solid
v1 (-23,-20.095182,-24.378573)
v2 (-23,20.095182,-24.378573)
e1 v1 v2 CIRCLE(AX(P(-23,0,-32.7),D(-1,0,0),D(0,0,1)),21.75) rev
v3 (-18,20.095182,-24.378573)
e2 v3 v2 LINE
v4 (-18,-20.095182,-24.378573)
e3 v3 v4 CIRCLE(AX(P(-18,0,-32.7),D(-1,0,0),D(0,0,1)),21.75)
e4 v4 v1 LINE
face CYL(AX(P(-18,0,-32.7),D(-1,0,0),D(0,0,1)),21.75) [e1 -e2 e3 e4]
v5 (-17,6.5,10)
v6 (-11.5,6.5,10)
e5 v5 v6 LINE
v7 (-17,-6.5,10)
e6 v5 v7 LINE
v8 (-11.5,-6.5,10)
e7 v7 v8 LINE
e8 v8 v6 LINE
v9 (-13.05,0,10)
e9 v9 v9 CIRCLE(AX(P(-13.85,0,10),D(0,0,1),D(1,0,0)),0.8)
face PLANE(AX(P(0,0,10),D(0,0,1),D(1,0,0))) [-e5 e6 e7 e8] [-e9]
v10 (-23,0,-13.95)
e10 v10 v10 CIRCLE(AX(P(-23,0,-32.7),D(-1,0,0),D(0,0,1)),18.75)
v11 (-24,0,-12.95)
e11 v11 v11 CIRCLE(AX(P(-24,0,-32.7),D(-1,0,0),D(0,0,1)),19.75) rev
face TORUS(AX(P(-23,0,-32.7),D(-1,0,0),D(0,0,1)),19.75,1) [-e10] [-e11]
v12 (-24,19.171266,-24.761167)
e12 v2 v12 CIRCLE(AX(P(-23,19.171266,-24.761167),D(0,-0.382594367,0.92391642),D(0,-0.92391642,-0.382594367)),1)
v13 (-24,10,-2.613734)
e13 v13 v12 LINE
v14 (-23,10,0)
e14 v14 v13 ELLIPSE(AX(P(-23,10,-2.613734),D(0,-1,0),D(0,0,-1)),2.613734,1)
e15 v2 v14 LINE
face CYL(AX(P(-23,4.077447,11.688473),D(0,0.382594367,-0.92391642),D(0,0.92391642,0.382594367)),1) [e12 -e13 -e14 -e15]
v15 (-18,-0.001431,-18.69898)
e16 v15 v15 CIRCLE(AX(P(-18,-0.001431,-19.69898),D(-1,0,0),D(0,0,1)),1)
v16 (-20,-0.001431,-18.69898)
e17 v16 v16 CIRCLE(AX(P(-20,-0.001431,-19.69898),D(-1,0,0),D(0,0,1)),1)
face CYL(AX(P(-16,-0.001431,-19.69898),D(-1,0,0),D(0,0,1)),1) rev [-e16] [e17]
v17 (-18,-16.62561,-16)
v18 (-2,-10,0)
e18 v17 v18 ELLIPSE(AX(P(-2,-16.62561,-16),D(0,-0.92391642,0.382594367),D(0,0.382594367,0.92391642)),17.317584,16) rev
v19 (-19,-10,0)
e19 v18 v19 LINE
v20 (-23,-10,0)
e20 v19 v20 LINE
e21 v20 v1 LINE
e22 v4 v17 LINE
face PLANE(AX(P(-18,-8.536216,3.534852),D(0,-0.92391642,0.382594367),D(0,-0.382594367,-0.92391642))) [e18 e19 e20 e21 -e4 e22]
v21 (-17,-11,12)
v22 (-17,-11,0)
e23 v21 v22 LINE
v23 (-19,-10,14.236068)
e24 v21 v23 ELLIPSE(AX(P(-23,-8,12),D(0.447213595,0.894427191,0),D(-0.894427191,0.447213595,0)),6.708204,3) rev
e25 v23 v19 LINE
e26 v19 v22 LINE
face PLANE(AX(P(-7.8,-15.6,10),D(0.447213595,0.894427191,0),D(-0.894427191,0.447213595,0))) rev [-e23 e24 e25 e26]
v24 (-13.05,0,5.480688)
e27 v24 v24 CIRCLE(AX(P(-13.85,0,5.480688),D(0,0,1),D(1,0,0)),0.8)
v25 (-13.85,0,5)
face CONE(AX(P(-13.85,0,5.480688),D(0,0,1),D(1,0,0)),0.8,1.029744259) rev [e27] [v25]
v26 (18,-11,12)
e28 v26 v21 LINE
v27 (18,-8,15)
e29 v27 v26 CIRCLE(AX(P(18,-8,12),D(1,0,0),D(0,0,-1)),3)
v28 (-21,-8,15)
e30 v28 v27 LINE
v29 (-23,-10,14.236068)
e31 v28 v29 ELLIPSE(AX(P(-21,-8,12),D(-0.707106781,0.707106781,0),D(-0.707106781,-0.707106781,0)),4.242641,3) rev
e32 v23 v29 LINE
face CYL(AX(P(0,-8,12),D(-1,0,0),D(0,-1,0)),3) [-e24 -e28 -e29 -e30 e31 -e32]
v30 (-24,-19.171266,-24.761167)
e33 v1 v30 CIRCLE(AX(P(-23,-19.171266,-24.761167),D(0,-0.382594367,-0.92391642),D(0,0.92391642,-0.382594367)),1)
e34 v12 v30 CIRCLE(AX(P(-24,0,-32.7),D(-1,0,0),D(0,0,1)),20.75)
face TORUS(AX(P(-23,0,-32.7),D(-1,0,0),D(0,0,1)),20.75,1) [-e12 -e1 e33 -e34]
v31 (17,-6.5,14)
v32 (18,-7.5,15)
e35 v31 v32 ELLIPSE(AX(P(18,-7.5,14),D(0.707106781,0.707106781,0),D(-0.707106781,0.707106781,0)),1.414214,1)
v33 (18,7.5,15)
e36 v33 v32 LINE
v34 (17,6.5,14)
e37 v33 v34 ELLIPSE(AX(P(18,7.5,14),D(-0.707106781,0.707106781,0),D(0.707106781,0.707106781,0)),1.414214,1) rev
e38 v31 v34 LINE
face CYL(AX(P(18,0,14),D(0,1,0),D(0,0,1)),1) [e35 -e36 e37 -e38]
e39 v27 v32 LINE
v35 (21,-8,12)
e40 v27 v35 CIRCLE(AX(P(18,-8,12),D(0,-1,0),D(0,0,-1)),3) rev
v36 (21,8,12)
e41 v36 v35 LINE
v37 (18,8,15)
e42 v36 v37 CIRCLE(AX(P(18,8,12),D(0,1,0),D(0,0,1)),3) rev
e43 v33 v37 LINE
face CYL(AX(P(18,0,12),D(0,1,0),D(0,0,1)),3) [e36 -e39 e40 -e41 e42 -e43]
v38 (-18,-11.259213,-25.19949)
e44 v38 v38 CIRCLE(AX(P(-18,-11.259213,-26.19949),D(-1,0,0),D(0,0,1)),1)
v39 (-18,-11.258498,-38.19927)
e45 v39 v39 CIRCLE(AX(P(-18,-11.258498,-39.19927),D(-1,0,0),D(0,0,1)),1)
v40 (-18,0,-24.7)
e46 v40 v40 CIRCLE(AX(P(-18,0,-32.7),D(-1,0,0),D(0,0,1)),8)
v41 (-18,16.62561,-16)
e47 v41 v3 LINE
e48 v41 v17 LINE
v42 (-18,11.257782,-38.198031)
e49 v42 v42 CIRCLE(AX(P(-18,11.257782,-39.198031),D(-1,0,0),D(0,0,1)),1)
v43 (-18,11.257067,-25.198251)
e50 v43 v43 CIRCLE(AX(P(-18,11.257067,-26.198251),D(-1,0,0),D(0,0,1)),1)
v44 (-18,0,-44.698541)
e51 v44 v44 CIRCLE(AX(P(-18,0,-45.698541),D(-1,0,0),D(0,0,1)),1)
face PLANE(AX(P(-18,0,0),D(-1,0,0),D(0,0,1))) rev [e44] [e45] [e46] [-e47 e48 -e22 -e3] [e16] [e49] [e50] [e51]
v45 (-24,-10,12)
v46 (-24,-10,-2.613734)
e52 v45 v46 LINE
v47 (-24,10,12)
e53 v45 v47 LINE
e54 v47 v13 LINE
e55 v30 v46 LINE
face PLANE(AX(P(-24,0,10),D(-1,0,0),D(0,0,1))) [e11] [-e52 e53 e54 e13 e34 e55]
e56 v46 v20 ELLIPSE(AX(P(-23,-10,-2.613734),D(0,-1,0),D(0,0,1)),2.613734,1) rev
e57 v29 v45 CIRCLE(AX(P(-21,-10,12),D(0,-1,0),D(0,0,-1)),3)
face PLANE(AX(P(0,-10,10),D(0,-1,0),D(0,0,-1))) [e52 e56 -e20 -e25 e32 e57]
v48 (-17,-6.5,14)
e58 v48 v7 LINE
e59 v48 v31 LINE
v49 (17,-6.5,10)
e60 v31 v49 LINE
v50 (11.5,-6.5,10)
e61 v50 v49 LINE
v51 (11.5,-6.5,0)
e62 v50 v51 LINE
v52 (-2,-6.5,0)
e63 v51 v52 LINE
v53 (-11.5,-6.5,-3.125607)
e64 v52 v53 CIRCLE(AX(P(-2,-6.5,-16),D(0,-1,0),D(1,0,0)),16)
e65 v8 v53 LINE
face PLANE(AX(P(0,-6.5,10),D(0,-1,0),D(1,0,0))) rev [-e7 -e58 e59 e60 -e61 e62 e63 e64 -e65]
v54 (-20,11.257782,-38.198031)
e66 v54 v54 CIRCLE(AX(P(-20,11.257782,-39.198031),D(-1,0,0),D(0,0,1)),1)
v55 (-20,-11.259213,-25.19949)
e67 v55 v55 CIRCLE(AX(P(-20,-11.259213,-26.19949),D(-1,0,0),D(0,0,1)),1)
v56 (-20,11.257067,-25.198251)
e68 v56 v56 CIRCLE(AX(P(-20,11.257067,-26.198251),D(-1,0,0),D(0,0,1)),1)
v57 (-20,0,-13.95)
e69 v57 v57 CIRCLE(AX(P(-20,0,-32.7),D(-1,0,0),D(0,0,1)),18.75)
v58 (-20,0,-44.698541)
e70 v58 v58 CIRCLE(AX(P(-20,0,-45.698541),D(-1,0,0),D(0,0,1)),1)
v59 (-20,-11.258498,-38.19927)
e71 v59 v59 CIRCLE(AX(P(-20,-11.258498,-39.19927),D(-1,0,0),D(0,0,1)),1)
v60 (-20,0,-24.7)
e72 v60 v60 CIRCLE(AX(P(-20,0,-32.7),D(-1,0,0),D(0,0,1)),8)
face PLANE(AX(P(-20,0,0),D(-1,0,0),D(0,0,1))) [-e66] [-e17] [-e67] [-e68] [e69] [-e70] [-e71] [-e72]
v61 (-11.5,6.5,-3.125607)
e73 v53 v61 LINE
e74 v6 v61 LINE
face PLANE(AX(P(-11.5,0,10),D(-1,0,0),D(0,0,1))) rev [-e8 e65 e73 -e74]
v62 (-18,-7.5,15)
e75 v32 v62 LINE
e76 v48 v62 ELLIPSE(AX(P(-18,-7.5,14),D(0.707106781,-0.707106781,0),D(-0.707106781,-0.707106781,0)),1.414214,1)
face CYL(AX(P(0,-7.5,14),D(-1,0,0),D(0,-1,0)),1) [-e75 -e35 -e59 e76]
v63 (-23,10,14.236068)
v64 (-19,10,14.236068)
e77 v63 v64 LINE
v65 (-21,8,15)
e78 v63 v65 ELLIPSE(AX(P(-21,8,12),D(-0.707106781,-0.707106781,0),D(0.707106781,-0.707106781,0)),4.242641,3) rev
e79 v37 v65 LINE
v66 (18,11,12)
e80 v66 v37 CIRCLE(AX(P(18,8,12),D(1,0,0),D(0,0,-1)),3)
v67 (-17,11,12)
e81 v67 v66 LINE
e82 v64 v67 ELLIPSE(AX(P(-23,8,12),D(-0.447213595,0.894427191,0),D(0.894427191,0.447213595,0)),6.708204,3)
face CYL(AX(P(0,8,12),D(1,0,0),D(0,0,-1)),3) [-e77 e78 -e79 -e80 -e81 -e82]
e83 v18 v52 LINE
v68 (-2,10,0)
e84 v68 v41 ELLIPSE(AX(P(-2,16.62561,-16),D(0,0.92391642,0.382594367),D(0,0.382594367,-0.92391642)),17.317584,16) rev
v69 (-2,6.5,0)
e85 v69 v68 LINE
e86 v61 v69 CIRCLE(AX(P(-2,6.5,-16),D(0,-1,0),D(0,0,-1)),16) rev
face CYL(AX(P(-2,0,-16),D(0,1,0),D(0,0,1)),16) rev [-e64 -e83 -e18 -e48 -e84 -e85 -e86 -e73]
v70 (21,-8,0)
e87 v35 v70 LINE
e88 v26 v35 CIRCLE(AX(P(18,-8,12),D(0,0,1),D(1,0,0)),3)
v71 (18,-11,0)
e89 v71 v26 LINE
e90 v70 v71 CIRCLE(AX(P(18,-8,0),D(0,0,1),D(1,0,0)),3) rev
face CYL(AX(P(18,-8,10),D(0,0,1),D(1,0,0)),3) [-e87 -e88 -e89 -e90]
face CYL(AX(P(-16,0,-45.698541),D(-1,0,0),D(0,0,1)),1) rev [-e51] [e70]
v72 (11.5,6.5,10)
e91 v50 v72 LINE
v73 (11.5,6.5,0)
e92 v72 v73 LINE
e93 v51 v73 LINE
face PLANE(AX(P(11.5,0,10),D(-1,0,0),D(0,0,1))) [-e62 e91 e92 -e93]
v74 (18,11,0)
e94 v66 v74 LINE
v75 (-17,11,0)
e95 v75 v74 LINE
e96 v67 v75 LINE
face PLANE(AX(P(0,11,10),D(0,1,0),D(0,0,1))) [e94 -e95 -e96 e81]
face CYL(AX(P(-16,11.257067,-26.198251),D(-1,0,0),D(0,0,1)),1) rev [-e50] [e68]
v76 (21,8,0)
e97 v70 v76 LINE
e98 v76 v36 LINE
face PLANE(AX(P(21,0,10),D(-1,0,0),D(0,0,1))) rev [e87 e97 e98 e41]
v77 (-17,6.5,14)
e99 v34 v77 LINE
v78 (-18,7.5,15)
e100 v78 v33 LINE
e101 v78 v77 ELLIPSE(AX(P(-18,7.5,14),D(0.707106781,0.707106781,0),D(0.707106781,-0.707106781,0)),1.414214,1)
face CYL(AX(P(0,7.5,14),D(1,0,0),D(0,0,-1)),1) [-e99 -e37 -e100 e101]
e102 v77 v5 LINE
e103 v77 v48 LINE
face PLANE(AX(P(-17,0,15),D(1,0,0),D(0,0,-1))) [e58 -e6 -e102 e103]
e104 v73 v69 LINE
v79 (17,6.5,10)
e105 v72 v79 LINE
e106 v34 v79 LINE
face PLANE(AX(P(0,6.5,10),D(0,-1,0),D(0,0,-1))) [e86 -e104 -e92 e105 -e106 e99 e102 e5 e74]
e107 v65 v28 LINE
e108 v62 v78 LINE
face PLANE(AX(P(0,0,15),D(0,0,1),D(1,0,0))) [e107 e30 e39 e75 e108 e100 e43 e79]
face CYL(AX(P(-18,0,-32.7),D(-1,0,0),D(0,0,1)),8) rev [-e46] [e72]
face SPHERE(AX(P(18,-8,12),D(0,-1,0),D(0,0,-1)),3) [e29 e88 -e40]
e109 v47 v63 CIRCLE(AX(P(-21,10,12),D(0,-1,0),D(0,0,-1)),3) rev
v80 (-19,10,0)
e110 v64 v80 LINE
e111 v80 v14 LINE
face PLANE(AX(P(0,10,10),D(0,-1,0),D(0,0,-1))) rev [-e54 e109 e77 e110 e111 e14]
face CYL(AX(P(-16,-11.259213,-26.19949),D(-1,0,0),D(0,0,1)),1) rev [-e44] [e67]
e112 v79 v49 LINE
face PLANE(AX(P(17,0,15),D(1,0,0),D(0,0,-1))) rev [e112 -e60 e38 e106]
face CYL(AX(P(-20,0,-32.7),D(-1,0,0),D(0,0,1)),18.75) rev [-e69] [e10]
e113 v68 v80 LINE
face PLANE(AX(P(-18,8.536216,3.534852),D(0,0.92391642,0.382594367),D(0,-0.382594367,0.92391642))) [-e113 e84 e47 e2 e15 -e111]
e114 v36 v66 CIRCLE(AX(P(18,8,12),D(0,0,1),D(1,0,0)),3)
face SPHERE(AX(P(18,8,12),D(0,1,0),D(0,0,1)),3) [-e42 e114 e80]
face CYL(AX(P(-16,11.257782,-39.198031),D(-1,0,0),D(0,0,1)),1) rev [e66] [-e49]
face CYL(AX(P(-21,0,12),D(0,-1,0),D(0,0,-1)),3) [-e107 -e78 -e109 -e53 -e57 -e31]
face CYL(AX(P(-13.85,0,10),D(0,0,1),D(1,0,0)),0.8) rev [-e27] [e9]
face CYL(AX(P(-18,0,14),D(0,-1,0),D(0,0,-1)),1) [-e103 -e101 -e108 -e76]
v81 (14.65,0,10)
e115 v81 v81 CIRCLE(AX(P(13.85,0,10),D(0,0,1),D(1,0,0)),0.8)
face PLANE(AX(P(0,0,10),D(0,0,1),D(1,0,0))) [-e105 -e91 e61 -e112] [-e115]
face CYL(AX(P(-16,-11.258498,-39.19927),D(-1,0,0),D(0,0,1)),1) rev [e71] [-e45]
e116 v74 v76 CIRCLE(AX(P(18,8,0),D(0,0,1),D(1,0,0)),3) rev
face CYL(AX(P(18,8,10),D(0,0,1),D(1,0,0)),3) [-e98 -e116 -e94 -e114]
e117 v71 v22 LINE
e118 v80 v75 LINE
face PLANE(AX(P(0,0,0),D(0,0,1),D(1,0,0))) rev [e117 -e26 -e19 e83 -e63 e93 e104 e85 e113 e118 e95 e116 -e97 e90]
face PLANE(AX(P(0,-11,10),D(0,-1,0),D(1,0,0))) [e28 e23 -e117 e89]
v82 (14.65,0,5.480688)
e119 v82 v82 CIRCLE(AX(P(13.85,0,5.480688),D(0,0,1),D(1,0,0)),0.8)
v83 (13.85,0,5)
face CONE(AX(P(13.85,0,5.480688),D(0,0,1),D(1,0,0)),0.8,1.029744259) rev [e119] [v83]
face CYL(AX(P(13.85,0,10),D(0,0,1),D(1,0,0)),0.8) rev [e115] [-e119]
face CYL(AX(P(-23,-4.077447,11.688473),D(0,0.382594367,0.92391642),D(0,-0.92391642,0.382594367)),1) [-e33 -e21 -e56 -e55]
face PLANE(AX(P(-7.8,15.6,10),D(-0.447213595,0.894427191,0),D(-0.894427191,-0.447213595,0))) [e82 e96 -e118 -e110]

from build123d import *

# Parameters (mm, degrees)
SKETCH_1_W              = 23
SKETCH_1_H              = 13
EXTRUDE_1_DEPTH         = 10
EXTRUDE_START           = 10
SKETCH_1_5_W            = 4
SKETCH_1_5_H            = 22
SKETCH_1_5_W_2          = 5
SKETCH_1_5_H_2          = 20
EXTRUDE_2_DEPTH         = 5
SKETCH_9_R              = 21.75
SKETCH_9_R_2            = 18.75
SKETCH_9_R_3            = 8
EXTRUDE_4_DEPTH         = 6
SKETCH_9_5_R            = 18.75
CUT_EXTRUDE_4_DEPTH     = 4
FILLET_6_R              = 1
SKETCH_10_R             = 1
CUT_EXTRUDE_5_DEPTH     = 4
FILLET_3_R              = 1
HOLE_WIZARD_M1_41_D     = 1.6
HOLE_WIZARD_M1_41_DEPTH = 4.519311505
HOLE_WIZARD_M1_41_TIP   = 0.480688495
FILLET_7_R              = 3
FILLET_8_R              = 16


with BuildPart() as part:
    # Эскиз1 → Бобышка-Вытянуть1 (new body)
    with BuildSketch(Plane.XY):
        Polygon((-17, -11), (21, -11), (21, 11), (-17, 11), (-19, 10), (-24, 10), (-24, -10), (-19, -10), align=None)
        Rectangle(SKETCH_1_W, SKETCH_1_H, mode=Mode.SUBTRACT)
    extrude(amount=EXTRUDE_1_DEPTH)

    # Эскиз1<5> → Бобышка-Вытянуть2 (add)
    with BuildSketch(Plane.XY.offset(EXTRUDE_START)):
        Polygon((-11.5, 6.5), (11.5, 6.5), (17, 6.5), (17, 11), (-17, 11), (-17, 6.5), align=None)
        with Locations((19, 0)):
            Rectangle(SKETCH_1_5_W, SKETCH_1_5_H)
        Polygon((17, -6.5), (11.5, -6.5), (-11.5, -6.5), (-17, -6.5), (-17, -11), (17, -11), align=None)
        Polygon((-19, -10), (-19, 10), (-17, 11), (-17, -11), align=None)
        with Locations((-21.5, 0)):
            Rectangle(SKETCH_1_5_W_2, SKETCH_1_5_H_2)
    extrude(amount=EXTRUDE_2_DEPTH)

    # Эскиз9 → Бобышка-Вытянуть4 (add)
    # profile 1 of 3: a face of its own
    with BuildSketch(Plane.ZY.offset(24)):
        with Locations((-32.7, 0)):
            Circle(SKETCH_9_R)
        with Locations((-32.7, 0)):
            Circle(SKETCH_9_R_2, mode=Mode.SUBTRACT)
    # profile 2 of 3: a face of its own
    with BuildSketch(Plane.ZY.offset(24)):
        with BuildLine():
            ThreePointArc((-10.95, 0), (-14.616118395, -12.08452424), (-24.378572515, -20.095182124))
            Line((-24.378572515, -20.095182124), (0, -10))
            Line((0, -10), (0, 10))
            Line((0, 10), (-24.378572515, 20.095182124))
            ThreePointArc((-24.378572515, 20.095182124), (-14.616118395, 12.08452424), (-10.95, 0))
        make_face()
    # profile 3 of 3: a face of its own
    with BuildSketch(Plane.ZY.offset(24)):
        with Locations((-32.7, 0)):
            Circle(SKETCH_9_R_2)
        with Locations((-32.7, 0)):
            Circle(SKETCH_9_R_3, mode=Mode.SUBTRACT)
    extrude(amount=-EXTRUDE_4_DEPTH)

    # Эскиз9<5> → Вырез-Вытянуть4 (cut)
    with BuildSketch(Plane.ZY.offset(24)):
        with Locations((-32.7, 0)):
            Circle(SKETCH_9_5_R)
    extrude(amount=-CUT_EXTRUDE_4_DEPTH, mode=Mode.SUBTRACT)

    # Скругление6
    fillet_6_edges = [part.edges().sort_by_distance(p)[0] for p in [
        (-24, 0, -51.45),
        (-24, 0, -54.45),
        (-24, -15.047591062, -12.189286258),
        (-24, 15.047591062, -12.189286258),
    ]]
    fillet(fillet_6_edges, radius=FILLET_6_R)

    # Эскиз10 → Вырез-Вытянуть5 (cut)
    with BuildSketch(Plane.ZY.offset(20)):
        with Locations((-45.698540936, 0)):
            Circle(SKETCH_10_R)
        with Locations((-39.198031114, 11.257782204)):
            Circle(SKETCH_10_R)
        with Locations((-26.198250825, 11.257066663)):
            Circle(SKETCH_10_R)
        with Locations((-19.698980357, -0.001431082)):
            Circle(SKETCH_10_R)
        with Locations((-26.199490179, -11.259213286)):
            Circle(SKETCH_10_R)
        with Locations((-39.199270468, -11.258497745)):
            Circle(SKETCH_10_R)
    extrude(amount=-CUT_EXTRUDE_5_DEPTH, mode=Mode.SUBTRACT)

    # Скругление3
    fillet_3_edges = [part.edges().sort_by_distance(p)[0] for p in [
        (0, 6.5, 15),
        (17, 0, 15),
        (-17, 0, 15),
        (0, -6.5, 15),
    ]]
    fillet(fillet_3_edges, radius=FILLET_3_R)

    # Отверстие с зазором M1.41
    with Locations(Plane.XY.offset(10)):
        with Locations((13.85, 0), (-13.85, 0)):
            Hole(HOLE_WIZARD_M1_41_D / 2, depth=HOLE_WIZARD_M1_41_DEPTH)
            with Locations((0, 0, -(HOLE_WIZARD_M1_41_DEPTH + HOLE_WIZARD_M1_41_TIP / 2))):  # 118° drill point
                Cone(0, HOLE_WIZARD_M1_41_D / 2, HOLE_WIZARD_M1_41_TIP, mode=Mode.SUBTRACT)

    # Скругление7
    # the kernel refuses this fillet: 3 mm, written as the material it takes off along each edge
    with BuildSketch(Plane(origin=(18, -8, 12), x_dir=(0, -1, 0), z_dir=(0, 0, 1))) as fillet_7_piece_1_section:
        Polygon((0, 0), (FILLET_7_R, 0), (FILLET_7_R, FILLET_7_R), (0, FILLET_7_R), align=None)
    fillet_7_piece_1 = extrude(amount=FILLET_7_R, mode=Mode.PRIVATE)
    fillet_7_piece_1 = fillet_7_piece_1 - Plane(origin=(18, -8, 12), x_dir=(-0.7071067811865475, 0.7071067811865475, 0), z_dir=(0, 0, 1)) * Sphere(FILLET_7_R, mode=Mode.PRIVATE)
    add(fillet_7_piece_1, mode=Mode.SUBTRACT)
    with BuildSketch(Plane(origin=(18, 8, 12), x_dir=(1, 0, 0), z_dir=(0, 0, 1))) as fillet_7_piece_2_section:
        Polygon((0, 0), (FILLET_7_R, 0), (FILLET_7_R, FILLET_7_R), (0, FILLET_7_R), align=None)
    fillet_7_piece_2 = extrude(amount=FILLET_7_R, mode=Mode.PRIVATE)
    fillet_7_piece_2 = fillet_7_piece_2 - Plane(origin=(18, 8, 12), x_dir=(-0.7071067811865475, -0.7071067811865476, 0), z_dir=(0, 0, 1)) * Sphere(FILLET_7_R, mode=Mode.PRIVATE)
    add(fillet_7_piece_2, mode=Mode.SUBTRACT)
    with BuildSketch(Plane(origin=(21, -8, 15), x_dir=(-1, 0, 0), z_dir=(0, 1, 0))) as fillet_7_piece_3:
        with BuildLine():
            CenterArc((FILLET_7_R, -FILLET_7_R), FILLET_7_R, 90, 90)
            Line((0, -FILLET_7_R), (0, 0))
            Line((0, 0), (FILLET_7_R, 0))
        make_face()
    extrude(amount=16, mode=Mode.SUBTRACT)
    with BuildSketch(Plane(origin=(-24.5, -11, 15), x_dir=(0, 1, 0), z_dir=(1, 0, 0)), Plane(origin=(18, 11, 15), x_dir=(0, -1, 0), z_dir=(-1, 0, 0))) as fillet_7_piece_4:
        with BuildLine():
            CenterArc((FILLET_7_R, -FILLET_7_R), FILLET_7_R, 90, 90)
            Line((0, -FILLET_7_R), (0, 0))
            Line((0, 0), (FILLET_7_R, 0))
        make_face()
    extrude(amount=42.5, mode=Mode.SUBTRACT)
    with BuildSketch(Plane(origin=(21, 11, -7.5), x_dir=(0, -1, 0), z_dir=(0, 0, 1)), Plane(origin=(21, -11, -7.5), x_dir=(-1, 0, 0), z_dir=(0, 0, 1))) as fillet_7_piece_5:
        with BuildLine():
            CenterArc((FILLET_7_R, -FILLET_7_R), FILLET_7_R, 90, 90)
            Line((0, -FILLET_7_R), (0, 0))
            Line((0, 0), (FILLET_7_R, 0))
        make_face()
    extrude(amount=19.5, mode=Mode.SUBTRACT)
    with BuildSketch(Plane(origin=(-24, -17.5, 15), x_dir=(1, 0, 0), z_dir=(0, 1, 0))) as fillet_7_piece_6:
        with BuildLine():
            CenterArc((FILLET_7_R, FILLET_7_R), FILLET_7_R, 180, 90)
            Line((0, FILLET_7_R), (0, 0))
            Line((0, 0), (FILLET_7_R, 0))
        make_face()
    extrude(amount=35, mode=Mode.SUBTRACT)

    # Скругление8
    # the kernel refuses this fillet: 16 mm, written as the material it adds along each edge
    with BuildSketch(Plane(origin=(-18, -50, 0), x_dir=(1, 0, 0), z_dir=(0, 1, 0))) as fillet_8_piece_1_section:
        with BuildLine():
            CenterArc((FILLET_8_R, FILLET_8_R), FILLET_8_R, 180, 90)
            Line((0, FILLET_8_R), (0, 0))
            Line((0, 0), (FILLET_8_R, 0))
        make_face()
    fillet_8_piece_1 = extrude(amount=100, mode=Mode.PRIVATE)
    fillet_8_piece_1 = split(fillet_8_piece_1, bisect_by=Plane(origin=(-17.157282296, -13.337247559, -8.059025643), z_dir=(0, 0.9239164195137738, -0.38259436712117)), keep=Keep.TOP, mode=Mode.PRIVATE)
    fillet_8_piece_1 = split(fillet_8_piece_1, bisect_by=Plane(origin=(-17.157282296, 9.732934462, 0.644929087), z_dir=(0, -0.9239164195137736, -0.3825943671211702)), keep=Keep.TOP, mode=Mode.PRIVATE)
    fillet_8_piece_1 = split(fillet_8_piece_1, bisect_by=Plane(origin=(-11.5, -12.311624775, -8.483736679), z_dir=(-1, 0, 0)), keep=Keep.TOP, mode=Mode.PRIVATE)
    add(fillet_8_piece_1)
    with BuildSketch(Plane(origin=(-18, -50, 0), x_dir=(1, 0, 0), z_dir=(0, 1, 0))) as fillet_8_piece_2_section:
        with BuildLine():
            CenterArc((FILLET_8_R, FILLET_8_R), FILLET_8_R, 180, 90)
            Line((0, FILLET_8_R), (0, 0))
            Line((0, 0), (FILLET_8_R, 0))
        make_face()
    fillet_8_piece_2 = extrude(amount=100, mode=Mode.PRIVATE)
    fillet_8_piece_2 = split(fillet_8_piece_2, bisect_by=Plane(origin=(-11.244845554, -6.5, -2.767260165), z_dir=(0, -1, 0)), keep=Keep.TOP, mode=Mode.PRIVATE)
    fillet_8_piece_2 = split(fillet_8_piece_2, bisect_by=Plane(origin=(-11.244845554, -11.135244088, -2.741469147), z_dir=(0, 0.9239164195137738, -0.38259436712117)), keep=Keep.TOP, mode=Mode.PRIVATE)
    add(fillet_8_piece_2)
    with BuildSketch(Plane(origin=(-18, -50, 0), x_dir=(1, 0, 0), z_dir=(0, 1, 0))) as fillet_8_piece_3_section:
        with BuildLine():
            CenterArc((FILLET_8_R, FILLET_8_R), FILLET_8_R, 180, 90)
            Line((0, FILLET_8_R), (0, 0))
            Line((0, 0), (FILLET_8_R, 0))
        make_face()
    fillet_8_piece_3 = extrude(amount=100, mode=Mode.PRIVATE)
    fillet_8_piece_3 = split(fillet_8_piece_3, bisect_by=Plane(origin=(-9.25068262, 6.5, -0.972078171), z_dir=(0, 1, 0)), keep=Keep.TOP, mode=Mode.PRIVATE)
    fillet_8_piece_3 = split(fillet_8_piece_3, bisect_by=Plane(origin=(-9.25068262, 10.116600815, -0.281576041), z_dir=(0, -0.9239164195137736, -0.3825943671211702)), keep=Keep.TOP, mode=Mode.PRIVATE)
    add(fillet_8_piece_3)


solid = part.part
